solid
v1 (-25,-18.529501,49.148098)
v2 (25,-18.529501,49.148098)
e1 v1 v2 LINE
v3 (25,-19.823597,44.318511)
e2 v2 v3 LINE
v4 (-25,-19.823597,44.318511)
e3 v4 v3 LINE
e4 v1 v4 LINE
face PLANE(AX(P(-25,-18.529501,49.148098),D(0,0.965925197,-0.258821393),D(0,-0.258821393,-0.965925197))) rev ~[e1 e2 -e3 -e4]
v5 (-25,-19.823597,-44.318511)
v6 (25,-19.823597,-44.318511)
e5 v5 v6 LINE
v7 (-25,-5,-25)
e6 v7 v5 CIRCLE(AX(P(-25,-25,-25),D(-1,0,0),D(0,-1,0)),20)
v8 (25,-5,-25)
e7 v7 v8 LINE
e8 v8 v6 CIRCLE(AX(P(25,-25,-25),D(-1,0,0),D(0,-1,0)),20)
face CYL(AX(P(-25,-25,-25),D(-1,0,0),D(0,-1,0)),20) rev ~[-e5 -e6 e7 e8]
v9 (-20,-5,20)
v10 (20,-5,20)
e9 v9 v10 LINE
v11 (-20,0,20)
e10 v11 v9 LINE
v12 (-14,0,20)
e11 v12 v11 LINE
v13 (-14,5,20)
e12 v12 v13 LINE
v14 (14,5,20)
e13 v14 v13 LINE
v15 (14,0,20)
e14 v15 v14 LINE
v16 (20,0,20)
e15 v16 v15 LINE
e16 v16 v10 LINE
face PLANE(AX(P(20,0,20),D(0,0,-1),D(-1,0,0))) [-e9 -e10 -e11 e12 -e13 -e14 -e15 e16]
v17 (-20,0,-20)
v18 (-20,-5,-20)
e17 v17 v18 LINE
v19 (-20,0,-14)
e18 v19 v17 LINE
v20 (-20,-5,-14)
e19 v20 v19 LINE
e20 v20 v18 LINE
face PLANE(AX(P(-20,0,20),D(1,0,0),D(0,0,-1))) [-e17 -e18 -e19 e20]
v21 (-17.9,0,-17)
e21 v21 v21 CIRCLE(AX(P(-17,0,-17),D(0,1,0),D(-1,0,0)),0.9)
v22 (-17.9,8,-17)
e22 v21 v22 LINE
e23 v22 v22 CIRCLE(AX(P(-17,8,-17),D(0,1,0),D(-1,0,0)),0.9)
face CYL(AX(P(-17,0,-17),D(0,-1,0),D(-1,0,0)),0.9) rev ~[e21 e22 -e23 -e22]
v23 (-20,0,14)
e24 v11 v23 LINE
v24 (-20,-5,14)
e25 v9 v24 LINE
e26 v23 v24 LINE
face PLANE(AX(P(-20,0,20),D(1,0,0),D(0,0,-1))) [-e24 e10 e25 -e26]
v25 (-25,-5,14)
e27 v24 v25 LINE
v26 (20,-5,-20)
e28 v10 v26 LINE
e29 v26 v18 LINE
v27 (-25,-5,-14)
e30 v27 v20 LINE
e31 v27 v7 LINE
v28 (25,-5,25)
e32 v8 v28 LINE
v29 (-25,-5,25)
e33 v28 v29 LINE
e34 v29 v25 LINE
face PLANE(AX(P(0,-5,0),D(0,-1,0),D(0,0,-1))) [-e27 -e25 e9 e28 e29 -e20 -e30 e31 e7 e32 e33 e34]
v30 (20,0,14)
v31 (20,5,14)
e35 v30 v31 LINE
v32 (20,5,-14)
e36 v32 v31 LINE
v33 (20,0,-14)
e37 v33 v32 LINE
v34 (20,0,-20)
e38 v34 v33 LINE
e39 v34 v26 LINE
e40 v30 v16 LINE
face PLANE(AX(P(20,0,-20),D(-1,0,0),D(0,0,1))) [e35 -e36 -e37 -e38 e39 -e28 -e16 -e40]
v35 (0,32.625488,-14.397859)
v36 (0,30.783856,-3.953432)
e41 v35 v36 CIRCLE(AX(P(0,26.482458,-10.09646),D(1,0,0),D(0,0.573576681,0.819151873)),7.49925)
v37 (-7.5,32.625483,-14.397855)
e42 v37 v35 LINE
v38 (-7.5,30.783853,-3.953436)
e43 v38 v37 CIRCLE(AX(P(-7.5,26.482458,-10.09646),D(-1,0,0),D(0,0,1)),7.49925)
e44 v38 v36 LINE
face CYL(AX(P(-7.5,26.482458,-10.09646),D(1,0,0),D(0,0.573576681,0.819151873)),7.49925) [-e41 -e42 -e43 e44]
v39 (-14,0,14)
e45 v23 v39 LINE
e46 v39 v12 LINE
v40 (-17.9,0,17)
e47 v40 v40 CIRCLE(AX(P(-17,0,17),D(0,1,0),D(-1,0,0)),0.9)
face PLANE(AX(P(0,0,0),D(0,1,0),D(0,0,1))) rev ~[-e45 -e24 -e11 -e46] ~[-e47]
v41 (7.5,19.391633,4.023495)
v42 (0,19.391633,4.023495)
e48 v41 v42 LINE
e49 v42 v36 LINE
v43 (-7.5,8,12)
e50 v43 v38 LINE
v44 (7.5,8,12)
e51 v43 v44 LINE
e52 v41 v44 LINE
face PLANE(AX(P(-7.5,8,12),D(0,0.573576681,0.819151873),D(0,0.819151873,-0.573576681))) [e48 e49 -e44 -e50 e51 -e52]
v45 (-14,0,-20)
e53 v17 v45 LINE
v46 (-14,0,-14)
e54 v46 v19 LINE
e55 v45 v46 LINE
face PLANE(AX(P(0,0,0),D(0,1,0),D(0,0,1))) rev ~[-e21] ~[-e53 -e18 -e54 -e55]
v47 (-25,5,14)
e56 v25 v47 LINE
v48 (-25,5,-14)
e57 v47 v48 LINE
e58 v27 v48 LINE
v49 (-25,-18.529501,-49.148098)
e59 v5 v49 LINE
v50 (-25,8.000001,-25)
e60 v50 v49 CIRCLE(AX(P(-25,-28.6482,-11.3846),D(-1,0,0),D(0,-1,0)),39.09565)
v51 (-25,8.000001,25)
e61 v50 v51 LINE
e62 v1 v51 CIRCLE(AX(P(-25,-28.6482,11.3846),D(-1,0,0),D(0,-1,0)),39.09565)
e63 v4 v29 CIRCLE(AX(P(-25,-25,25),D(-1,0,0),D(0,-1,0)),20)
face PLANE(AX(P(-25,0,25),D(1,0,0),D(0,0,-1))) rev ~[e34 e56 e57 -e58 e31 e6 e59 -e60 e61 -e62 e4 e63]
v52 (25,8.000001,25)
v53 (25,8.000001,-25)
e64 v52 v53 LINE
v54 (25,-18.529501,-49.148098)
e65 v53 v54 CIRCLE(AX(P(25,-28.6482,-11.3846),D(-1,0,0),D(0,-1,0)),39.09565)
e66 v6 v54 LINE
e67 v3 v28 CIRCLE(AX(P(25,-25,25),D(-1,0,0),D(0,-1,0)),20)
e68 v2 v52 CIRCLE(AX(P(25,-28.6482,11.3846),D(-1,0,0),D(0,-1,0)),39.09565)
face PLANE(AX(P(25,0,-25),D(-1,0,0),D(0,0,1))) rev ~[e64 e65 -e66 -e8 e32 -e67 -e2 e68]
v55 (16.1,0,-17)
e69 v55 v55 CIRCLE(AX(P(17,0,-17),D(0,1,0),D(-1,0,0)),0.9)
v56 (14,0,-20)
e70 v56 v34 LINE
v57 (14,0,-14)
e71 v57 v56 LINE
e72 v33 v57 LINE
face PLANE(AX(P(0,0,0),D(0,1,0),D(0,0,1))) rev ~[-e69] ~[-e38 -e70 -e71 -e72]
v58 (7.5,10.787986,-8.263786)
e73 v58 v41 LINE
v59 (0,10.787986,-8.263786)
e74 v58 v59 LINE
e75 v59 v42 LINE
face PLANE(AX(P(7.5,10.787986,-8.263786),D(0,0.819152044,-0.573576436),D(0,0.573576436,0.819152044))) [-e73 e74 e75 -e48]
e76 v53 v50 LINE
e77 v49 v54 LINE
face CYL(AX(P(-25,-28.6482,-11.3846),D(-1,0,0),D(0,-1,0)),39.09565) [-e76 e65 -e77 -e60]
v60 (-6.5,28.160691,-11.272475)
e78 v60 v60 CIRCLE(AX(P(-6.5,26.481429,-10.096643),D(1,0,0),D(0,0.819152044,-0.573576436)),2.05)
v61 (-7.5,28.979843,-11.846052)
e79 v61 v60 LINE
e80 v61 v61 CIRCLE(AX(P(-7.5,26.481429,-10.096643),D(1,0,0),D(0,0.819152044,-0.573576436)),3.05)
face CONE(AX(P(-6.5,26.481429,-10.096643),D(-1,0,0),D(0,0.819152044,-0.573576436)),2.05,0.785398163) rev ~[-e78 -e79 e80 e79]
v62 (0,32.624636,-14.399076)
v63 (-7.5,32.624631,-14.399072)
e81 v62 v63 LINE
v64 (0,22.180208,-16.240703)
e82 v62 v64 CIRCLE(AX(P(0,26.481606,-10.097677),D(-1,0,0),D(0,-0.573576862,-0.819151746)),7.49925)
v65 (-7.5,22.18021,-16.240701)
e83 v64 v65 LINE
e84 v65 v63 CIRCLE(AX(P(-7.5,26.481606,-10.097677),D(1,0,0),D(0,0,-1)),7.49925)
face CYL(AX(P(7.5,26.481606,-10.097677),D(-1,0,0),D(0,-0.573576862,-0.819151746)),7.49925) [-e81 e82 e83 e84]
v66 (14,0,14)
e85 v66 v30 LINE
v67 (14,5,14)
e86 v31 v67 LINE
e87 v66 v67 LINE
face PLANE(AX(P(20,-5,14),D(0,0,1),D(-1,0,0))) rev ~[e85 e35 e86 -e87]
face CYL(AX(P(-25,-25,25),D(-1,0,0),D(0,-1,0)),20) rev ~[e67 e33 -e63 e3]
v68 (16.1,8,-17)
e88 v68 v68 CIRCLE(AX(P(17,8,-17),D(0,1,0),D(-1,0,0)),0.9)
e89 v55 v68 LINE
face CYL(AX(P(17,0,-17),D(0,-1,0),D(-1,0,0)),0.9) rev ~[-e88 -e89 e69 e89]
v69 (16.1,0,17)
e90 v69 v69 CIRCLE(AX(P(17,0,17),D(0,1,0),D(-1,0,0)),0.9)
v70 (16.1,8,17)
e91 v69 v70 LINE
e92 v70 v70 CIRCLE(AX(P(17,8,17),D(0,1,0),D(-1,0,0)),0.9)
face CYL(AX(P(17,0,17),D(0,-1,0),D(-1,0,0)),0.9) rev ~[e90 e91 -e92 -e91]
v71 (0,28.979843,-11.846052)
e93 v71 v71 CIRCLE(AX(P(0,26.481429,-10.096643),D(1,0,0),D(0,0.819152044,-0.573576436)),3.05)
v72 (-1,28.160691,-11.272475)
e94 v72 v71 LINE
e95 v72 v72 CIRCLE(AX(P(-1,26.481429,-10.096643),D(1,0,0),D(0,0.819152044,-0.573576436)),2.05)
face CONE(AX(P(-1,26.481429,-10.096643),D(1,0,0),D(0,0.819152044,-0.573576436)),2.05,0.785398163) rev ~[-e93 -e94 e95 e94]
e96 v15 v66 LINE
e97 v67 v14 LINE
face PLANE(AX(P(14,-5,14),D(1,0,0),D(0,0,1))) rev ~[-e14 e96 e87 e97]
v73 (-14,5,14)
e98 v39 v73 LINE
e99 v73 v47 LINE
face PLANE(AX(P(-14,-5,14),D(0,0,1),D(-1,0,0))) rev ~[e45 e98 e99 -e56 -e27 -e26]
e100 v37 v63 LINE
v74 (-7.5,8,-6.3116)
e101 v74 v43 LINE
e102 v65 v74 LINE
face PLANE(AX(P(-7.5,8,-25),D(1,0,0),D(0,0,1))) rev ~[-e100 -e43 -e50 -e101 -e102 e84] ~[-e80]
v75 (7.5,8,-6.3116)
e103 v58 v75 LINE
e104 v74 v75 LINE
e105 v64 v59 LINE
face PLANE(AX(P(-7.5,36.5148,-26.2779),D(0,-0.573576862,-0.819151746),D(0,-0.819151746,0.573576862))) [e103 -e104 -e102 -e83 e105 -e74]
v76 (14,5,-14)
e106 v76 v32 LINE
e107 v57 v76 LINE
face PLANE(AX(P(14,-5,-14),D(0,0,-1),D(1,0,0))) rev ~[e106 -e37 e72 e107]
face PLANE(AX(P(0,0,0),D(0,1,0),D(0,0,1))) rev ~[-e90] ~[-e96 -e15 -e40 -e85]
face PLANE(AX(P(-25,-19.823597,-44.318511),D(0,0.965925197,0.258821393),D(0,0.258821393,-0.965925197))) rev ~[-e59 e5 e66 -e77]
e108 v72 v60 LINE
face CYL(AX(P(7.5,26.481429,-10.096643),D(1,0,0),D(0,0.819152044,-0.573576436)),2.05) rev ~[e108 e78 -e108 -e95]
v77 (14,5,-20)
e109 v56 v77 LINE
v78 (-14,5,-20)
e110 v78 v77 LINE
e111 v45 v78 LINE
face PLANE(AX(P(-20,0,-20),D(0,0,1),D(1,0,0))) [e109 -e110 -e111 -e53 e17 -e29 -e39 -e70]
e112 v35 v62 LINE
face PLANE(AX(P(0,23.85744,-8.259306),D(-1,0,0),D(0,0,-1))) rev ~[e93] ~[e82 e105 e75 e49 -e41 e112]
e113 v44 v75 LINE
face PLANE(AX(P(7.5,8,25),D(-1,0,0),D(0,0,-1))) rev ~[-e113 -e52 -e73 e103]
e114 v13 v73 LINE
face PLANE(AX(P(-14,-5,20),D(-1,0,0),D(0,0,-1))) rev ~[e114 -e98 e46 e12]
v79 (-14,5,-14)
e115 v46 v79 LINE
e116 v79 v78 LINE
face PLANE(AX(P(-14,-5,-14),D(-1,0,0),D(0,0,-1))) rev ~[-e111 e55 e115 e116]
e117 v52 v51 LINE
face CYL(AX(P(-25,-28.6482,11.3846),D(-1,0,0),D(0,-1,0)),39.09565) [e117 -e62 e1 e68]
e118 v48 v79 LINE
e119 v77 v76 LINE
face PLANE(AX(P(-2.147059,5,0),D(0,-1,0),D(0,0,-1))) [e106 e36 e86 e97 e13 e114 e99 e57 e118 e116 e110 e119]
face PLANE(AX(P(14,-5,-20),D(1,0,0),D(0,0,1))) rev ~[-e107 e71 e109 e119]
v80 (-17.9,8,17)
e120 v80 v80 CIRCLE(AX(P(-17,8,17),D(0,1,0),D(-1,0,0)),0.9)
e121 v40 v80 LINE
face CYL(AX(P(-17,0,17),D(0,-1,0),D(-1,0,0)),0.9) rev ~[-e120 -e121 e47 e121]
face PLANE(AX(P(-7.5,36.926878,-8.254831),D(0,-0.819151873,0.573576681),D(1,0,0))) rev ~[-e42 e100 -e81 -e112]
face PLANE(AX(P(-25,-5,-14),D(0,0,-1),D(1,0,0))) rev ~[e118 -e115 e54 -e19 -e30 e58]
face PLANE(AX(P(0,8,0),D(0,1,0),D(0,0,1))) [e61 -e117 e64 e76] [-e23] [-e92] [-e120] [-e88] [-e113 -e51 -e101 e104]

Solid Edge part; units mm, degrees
sketch "Sketch1" plane through (0, 0, 0) normal (0, -1, 0) x (1, 0, 0)
  line L0 (-20, -20) -> (20, -20)
  line L1 (20, -20) -> (20, 20)
  line L2 (20, 20) -> (-20, 20)
  line L3 (-20, 20) -> (-20, -20)
  line L4 (-25, -25) -> (25, -25)
  line L5 (25, -25) -> (25, 25)
  line L6 (25, 25) -> (-25, 25)
  line L7 (-25, 25) -> (-25, -25)
  dimension "D1" = 40
  dimension "D2" = 50
extrude "Protrusion1" add sketch "Sketch1" along normal blind 5
sketch "Sketch2" plane through (0, 0, 0) normal (0, 1, 0) x (-1, 0, 0)
  line L0 (-25, -25) -> (25, -25)
  line L1 (25, -25) -> (25, 25)
  line L2 (25, 25) -> (-25, 25)
  line L3 (-25, 25) -> (-25, -25)
  circle A0 centre (17, 17) radius 0.9
  circle A1 centre (-17, 17) radius 0.9
  circle A2 centre (-17, -17) radius 0.9
  circle A3 centre (17, -17) radius 0.9
extrude "Extrusionsausprägung_2" add sketch "Sketch2" along normal blind 8
sketch "Sketch3" plane through (-25, 1.5, 0) normal (-1, 0, 0) x (0, -1, 0)
  line L0 (6.5, 25) -> (-6.5, 25)
  arc A0 (20.0295, 49.1481) -> (-6.5, 25) centre (30.1482, 11.3846) ccw
  line L1 (20.0295, 49.1481) -> (21.3236, 44.3185)
  arc A1 (21.3236, 44.3185) -> (6.5, 25) centre (26.5, 25) ccw
  line L2 (6.5, -25) -> (-6.5, -25)
  arc A2 (-6.5, -25) -> (20.0295, -49.1481) centre (30.1482, -11.3846) ccw
  line L3 (21.3236, -44.3185) -> (20.0295, -49.1481)
  arc A3 (6.5, -25) -> (21.3236, -44.3185) centre (26.5, -25) ccw
  dimension "D1" = 5
  dimension "D2" = 5
  dimension "D3" = 20
  dimension "D4" = 20
extrude "Protrusion2" add sketch "Sketch3" against normal up to vertex (50 mm away)
sketch "Sketch4" plane through (0, -5, 0) normal (0, -1, 0) x (1, 0, 0)
  line L0 (-25, 14) -> (-25, -14)
  line L1 (-25, -14) -> (-14, -14)
  line L2 (-14, -14) -> (-14, -20)
  line L3 (-14, -20) -> (14, -20)
  line L4 (14, -20) -> (14, -14)
  line L5 (14, -14) -> (20, -14)
  line L6 (20, -14) -> (20, 14)
  line L7 (20, 14) -> (14, 14)
  line L8 (14, 14) -> (14, 20)
  line L9 (14, 20) -> (-14, 20)
  line L10 (-14, 20) -> (-14, 14)
  line L11 (-14, 14) -> (-25, 14)
  dimension "D1" = 6
extrude "Extrusionsausschnitt_1" cut sketch "Sketch4" against normal blind 10
sketch "Sketch5" plane through (0, 8, 0) normal (0, 1, 0) x (-1, 0, 0)
  line L0 (-7.5, -25) -> (7.5, -25)
  line L1 (7.5, -25) -> (7.5, 25)
  line L2 (7.5, 25) -> (-7.5, 25)
  line L3 (-7.5, 25) -> (-7.5, -25)
  dimension "D1" = 15
extrude "Extrusionsausprägung_6" add sketch "Sketch5" along normal blind 40
sketch "Sketch6" plane through (-7.5, 28, 0) normal (-1, 0, 0) x (0, -1, 0)
  line L0 (20, -6.3116) -> (20, -25)
  line L1 (-8.5148, -26.2779) -> (20, -6.3116)
  line L2 (-17.1184, -13.9906) -> (-8.5148, -26.2779)
  line L3 (20, 12) -> (-17.1184, -13.9906)
  line L4 (20, 25) -> (20, 12)
  line L5 (-20, 25) -> (20, 25)
  line L6 (-20, 25) -> (-40.7628, -3.883)
  line L7 (-40.7628, -3.883) -> (-20, -25)
  line L8 (-20, -25) -> (-14.3498, -34.4374)
  line L9 (-14.3498, -34.4374) -> (20, -25)
  dimension "D1" = 15
  dimension "D2" = 13
extrude "Cutout1" cut sketch "Sketch6" against normal through all
sketch "Sketch7" plane through (-7.5, 26.5592, -6.5) normal (-1, 0, 0) x (0, -0.819152, 0.5735764)
  line L0 (-19.4993, 4.5092) -> (-19.4993, -10.4908)
  line L1 (-19.4993, -10.4908) -> (-0.9802, -10.4908)
  line L2 (-0.9802, -10.4908) -> (-0.9802, 4.5092)
  line L3 (-0.9802, 4.5092) -> (-19.4993, 4.5092)
extrude "Protrusion3" add sketch "Sketch7" against normal up to vertex (15 mm away)
sketch "Sketch8" plane through (0, 26.5592, -0.9953) normal (0, 0.5735764, 0.819152) x (0, 0.819152, -0.5735764)
  line L0 (22.6566, 7.5) -> (12.6566, 7.5)
  line L1 (12.6566, 7.5) -> (12.6566, -7.5)
  line L2 (12.6566, -7.5) -> (22.6566, -7.5)
  line L3 (22.6566, -7.5) -> (22.6566, 7.5)
  dimension "D1" = 10
extrude "Cutout2" cut sketch "Sketch8" against normal through all
fillet "Verrundung_2" radius 7.5 2 edges at (0, 36.9269, -8.2548) (0, 28.3233, -20.5421)
sketch "Sketch9" plane through (7.5, 20.9907, -2.7983) normal (1, 0, 0) x (0, 0.819152, -0.5735764)
  circle A0 centre (8.6839, -2.8291) radius 2.05
  dimension "D1" = 4.1
extrude "Cutout3" cut sketch "Sketch9" against normal through all
chamfer "Fase_4" distance 1 angle 45 2 edges at (7.5, 24.8022, -8.9208) (-7.5, 26.4814, -8.0467)
sketch "Sketch10" plane through (7.5, 20.9907, -2.7983) normal (1, 0, 0) x (0, 0.819152, -0.5735764)
  line L0 (-5.2227, 4.6709) -> (16.1839, 4.6709)
  line L1 (16.1839, 4.6709) -> (16.1839, -10.3291)
  line L2 (16.1839, -10.3291) -> (-5.2227, -10.3291)
  line L3 (-5.2227, -10.3291) -> (-5.2227, 4.6709)
extrude "Extrusionsausschnitt_9" cut sketch "Sketch10" against normal blind 7.5
chamfer "Fase_5" distance 1 angle 45 1 edges at (0, 26.4814, -12.1467)
properties part number "A6.A1.3" material "Nylon, allgemein"
